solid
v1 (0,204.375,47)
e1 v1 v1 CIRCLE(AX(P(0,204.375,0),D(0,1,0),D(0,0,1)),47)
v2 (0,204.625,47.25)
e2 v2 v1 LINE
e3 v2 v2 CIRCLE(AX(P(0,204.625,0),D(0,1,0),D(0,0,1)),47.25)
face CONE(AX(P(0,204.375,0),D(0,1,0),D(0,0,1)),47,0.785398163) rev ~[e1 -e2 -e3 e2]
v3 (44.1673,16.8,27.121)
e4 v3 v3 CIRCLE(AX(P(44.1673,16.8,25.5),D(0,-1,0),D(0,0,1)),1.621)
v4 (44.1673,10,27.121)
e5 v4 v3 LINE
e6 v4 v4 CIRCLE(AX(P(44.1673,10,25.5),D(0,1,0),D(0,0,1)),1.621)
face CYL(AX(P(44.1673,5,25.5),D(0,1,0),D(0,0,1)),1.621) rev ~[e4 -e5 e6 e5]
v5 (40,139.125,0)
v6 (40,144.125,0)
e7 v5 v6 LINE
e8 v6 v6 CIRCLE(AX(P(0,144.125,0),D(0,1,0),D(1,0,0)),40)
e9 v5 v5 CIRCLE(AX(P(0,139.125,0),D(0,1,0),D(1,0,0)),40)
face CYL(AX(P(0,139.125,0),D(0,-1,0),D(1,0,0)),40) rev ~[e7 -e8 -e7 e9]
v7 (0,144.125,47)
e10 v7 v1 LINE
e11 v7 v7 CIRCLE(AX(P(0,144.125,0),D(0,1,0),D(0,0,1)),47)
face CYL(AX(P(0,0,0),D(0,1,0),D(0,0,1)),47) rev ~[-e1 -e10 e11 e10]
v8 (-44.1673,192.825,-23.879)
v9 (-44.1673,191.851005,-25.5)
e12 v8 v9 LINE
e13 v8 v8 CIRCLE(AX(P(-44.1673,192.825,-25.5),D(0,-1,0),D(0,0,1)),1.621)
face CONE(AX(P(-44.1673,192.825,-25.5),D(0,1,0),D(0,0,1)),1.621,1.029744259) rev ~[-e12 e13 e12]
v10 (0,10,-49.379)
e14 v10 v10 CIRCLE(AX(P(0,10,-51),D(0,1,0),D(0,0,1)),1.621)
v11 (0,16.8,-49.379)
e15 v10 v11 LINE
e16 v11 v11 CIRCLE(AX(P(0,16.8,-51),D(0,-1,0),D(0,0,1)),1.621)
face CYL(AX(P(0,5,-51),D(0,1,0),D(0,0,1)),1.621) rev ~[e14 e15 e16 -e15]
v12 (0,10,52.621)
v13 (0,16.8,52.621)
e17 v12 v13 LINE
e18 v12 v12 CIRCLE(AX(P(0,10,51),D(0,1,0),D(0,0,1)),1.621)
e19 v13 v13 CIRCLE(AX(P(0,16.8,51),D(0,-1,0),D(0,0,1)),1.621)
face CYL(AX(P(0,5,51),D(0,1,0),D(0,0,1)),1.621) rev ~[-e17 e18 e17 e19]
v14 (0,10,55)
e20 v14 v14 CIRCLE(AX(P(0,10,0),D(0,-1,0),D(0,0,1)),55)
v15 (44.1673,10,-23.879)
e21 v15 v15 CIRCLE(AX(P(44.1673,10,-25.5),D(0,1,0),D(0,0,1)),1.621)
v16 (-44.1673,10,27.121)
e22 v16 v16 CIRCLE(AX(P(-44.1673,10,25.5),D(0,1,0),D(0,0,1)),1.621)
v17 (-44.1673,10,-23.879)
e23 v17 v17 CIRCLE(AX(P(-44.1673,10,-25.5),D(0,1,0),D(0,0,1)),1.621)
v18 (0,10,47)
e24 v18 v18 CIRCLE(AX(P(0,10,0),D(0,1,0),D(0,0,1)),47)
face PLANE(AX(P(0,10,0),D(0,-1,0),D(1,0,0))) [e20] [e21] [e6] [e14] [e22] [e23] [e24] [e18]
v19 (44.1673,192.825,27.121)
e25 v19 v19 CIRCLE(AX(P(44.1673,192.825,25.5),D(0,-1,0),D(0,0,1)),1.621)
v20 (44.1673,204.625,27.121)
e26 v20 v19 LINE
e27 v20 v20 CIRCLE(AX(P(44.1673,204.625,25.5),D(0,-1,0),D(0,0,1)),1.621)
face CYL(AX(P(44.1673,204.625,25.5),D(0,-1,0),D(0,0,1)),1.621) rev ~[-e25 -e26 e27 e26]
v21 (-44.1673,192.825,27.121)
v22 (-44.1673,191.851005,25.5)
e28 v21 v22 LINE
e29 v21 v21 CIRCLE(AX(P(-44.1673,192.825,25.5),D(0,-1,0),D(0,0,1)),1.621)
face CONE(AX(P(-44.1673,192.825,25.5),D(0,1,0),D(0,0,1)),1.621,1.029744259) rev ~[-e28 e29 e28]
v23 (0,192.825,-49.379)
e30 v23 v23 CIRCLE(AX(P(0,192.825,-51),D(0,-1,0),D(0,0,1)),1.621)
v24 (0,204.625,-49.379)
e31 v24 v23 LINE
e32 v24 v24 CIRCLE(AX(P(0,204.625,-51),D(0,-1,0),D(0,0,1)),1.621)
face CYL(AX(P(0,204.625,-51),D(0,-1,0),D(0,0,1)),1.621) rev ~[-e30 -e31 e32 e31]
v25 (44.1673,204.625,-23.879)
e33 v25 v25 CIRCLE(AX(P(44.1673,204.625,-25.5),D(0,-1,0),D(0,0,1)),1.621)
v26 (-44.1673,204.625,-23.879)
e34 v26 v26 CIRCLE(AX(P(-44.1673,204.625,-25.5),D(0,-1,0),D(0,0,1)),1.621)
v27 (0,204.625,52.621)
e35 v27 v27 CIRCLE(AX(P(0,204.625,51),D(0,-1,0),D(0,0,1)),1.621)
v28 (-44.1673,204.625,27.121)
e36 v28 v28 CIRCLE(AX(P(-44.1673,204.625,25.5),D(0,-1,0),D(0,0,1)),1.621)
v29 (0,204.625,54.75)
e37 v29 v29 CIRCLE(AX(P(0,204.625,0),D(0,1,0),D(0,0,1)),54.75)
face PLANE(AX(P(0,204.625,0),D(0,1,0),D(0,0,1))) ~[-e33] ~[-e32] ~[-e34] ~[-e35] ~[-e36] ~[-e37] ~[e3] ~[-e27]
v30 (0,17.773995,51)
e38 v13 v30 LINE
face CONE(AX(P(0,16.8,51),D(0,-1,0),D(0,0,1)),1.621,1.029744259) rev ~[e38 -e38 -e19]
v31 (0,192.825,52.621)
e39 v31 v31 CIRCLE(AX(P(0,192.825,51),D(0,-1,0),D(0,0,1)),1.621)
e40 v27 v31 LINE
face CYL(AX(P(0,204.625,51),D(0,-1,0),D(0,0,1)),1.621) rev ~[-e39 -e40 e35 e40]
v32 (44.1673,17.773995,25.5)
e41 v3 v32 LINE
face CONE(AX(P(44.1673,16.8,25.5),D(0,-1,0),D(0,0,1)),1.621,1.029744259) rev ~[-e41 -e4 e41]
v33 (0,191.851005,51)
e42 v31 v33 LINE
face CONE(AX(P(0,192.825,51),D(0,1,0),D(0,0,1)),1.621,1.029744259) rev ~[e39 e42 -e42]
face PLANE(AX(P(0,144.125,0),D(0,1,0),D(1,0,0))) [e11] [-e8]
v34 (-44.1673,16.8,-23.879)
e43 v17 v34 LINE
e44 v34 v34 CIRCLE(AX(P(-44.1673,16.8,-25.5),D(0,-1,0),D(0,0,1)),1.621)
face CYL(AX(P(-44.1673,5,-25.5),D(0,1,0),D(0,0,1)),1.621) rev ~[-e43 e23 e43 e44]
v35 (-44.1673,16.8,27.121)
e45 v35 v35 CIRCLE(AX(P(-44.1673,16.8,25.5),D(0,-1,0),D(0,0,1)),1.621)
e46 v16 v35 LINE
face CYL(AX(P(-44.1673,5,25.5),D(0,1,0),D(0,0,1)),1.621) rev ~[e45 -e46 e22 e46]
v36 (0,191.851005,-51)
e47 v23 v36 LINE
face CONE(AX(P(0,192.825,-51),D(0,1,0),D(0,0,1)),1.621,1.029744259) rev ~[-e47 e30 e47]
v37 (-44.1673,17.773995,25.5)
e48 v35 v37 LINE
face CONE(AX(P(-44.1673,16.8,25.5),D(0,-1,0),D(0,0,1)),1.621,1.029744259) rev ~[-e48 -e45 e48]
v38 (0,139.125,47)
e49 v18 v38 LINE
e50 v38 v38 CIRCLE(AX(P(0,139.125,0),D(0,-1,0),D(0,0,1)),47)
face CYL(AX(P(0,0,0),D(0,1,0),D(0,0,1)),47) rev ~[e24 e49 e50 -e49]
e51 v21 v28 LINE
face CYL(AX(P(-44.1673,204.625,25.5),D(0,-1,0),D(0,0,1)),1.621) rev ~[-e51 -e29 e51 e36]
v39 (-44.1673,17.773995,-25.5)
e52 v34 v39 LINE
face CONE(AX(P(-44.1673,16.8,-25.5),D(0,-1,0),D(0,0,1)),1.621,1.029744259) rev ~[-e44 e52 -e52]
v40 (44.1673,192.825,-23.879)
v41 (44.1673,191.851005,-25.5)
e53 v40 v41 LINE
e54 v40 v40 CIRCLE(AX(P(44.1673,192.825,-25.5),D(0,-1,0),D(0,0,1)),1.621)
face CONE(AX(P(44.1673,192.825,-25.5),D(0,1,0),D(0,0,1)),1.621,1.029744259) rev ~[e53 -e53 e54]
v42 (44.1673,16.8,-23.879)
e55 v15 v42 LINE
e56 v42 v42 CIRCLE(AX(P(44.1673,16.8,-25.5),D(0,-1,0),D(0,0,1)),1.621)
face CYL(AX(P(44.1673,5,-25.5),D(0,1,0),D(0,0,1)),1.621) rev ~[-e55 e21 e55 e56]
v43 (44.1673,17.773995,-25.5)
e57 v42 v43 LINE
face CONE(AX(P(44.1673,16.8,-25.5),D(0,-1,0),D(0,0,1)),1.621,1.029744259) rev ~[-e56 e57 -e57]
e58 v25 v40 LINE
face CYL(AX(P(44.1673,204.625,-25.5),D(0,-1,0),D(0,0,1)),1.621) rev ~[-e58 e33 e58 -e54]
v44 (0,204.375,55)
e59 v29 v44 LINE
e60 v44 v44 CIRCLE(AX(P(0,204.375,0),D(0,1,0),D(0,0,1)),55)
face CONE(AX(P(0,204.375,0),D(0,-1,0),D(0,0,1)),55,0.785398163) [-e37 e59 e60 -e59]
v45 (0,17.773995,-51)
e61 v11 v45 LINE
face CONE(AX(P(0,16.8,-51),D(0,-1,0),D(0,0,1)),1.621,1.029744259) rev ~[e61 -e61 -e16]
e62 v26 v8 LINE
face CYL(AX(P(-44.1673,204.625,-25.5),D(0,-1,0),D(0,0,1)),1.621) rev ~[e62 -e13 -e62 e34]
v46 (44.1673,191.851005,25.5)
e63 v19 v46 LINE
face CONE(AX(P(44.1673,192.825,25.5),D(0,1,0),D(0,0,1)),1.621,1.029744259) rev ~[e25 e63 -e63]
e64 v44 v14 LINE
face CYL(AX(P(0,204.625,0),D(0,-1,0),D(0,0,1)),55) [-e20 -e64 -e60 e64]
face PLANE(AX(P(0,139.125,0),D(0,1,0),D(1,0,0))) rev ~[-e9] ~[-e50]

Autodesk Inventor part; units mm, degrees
ref_plane "YZ Plane" through (0, 0, 0) normal (1, 0, 0) x (0, 1, 0)
ref_plane "XZ Plane" through (0, 0, 0) normal (0, 1, 0) x (-1, 0, 0)
ref_plane "XY Plane" through (0, 0, 0) normal (0, 0, 1) x (1, 0, 0)
sketch "Skizze1" plane through (0, 0, 0) normal (1, 0, 0) x (0, 1, 0)
  line L0 (204.625, 55) -> (0, 55)
  line L1 (0, 55) -> (0, 47)
  line L2 (0, 47) -> (204.625, 47)
  line L3 (204.625, 47) -> (204.625, 55)
  line L4 (0, 47) -> (8, 47)
  line L5 (8, 47) -> (8, 0)
  line L6 (8, 0) -> (0, 0)
  line L7 (0, 0) -> (0, 47)
  line L8 (-40.925, 0) -> (245.55, 0) projected
  line L9 (0, -11) -> (0, 66) projected
  point P0 (0, 0)
  point P1 (4, 0)
  dimension "d0" = 8
  dimension "d1" = 8
  dimension "d2" = 204.625
  dimension "d3" = 47
  dimension "d4" = 0
  dimension "d5" = 0
revolve "Umdrehung1" add sketch "Skizze1" angle 360 about axis through (0, -10, 0) along (0, 1, 0)
sketch "Skizze2" plane through (0, 204.625, 0) normal (0, 1, 0) x (1, 0, 0)
  circle A0 centre (0, 0) radius 51 construction
  circle A1 centre (0, 0) radius 55 projected
  circle A2 centre (0, 0) radius 51 construction
  circle A3 centre (0, 0) radius 51 construction
  circle A4 centre (0, 0) radius 51 construction
  circle A5 centre (0, 0) radius 51 construction
  circle A6 centre (0, 0) radius 51 construction
  point P0 (0, -51)
  point P1 (44.1673, -25.5)
  point P2 (44.1673, 25.5)
  point P3 (0, 51)
  point P4 (-44.1673, 25.5)
  point P5 (-44.1673, -25.5)
  dimension "d16" = 4
  dimension "d19" = 360
hole "Bohrung1" at (0, 204.625, 51) at (44.1673, 204.625, 25.5) at (44.1673, 204.625, -25.5) at (0, 204.625, -51) at (-44.1673, 204.625, -25.5) at (-44.1673, 204.625, 25.5) direction (0, -1, 0) diameter 3.242 depth 11.8 tip angle 118 thread size "M4x0.7" class "6H" standard "ISO Metric profile"
chamfer "Fase1" distance 0.25 angle 45 1 edges at (0, 204.625, -47)
chamfer "Fase2" distance 0.25 angle 45 1 edges at (0, 204.625, -55)
chamfer "Fase3" distance 0.25 angle 45 1 edges at (0, 0, -55)
sketch "Skizze3" plane through (0, 0, 0) normal (0, -1, 0) x (1, 0, 0)
  circle A0 centre (0, 0) radius 60.1977
extrude "Extrusion1" cut sketch "Skizze3" against normal blind 10
ref_plane "Arbeitsebene1" through (0, 104.8125, 0) normal (0, 1, 0) x (1, 0, 0)
mirror "Spiegeln1" about plane through (0, 104.8125, 0) normal (0, 1, 0) of "Bohrung1"
ref_plane "Arbeitsebene3" through (0, 139.125, 0) normal (0, 1, 0) x (1, 0, 0)
sketch "Skizze4" plane through (0, 139.125, 0) normal (0, 1, 0) x (1, 0, 0)
  circle A0 centre (0, 0) radius 47 projected
  circle A1 centre (0, 0) radius 47 projected
  circle A2 centre (0, 0) radius 47
  circle A3 centre (0, 0) radius 47 projected
  circle A4 centre (0, 0) radius 40
  dimension "d33" = 7
extrude "Extrusion2" add sketch "Skizze4" along normal blind 5
sketch "Skizze5" plane through (0, 204.625, 0) normal (0, 1, 0) x (1, 0, 0)
  point P0 (-44.1673, -25.5)
hole "Bohrung2" at (-44.1673, 204.625, 25.5) direction (0, -1, 0) diameter 3.242 depth 8 tip angle 120 thread size "M4x0.7" class "6H" standard "ISO Metric profile"
properties part number "Gehäuse"
